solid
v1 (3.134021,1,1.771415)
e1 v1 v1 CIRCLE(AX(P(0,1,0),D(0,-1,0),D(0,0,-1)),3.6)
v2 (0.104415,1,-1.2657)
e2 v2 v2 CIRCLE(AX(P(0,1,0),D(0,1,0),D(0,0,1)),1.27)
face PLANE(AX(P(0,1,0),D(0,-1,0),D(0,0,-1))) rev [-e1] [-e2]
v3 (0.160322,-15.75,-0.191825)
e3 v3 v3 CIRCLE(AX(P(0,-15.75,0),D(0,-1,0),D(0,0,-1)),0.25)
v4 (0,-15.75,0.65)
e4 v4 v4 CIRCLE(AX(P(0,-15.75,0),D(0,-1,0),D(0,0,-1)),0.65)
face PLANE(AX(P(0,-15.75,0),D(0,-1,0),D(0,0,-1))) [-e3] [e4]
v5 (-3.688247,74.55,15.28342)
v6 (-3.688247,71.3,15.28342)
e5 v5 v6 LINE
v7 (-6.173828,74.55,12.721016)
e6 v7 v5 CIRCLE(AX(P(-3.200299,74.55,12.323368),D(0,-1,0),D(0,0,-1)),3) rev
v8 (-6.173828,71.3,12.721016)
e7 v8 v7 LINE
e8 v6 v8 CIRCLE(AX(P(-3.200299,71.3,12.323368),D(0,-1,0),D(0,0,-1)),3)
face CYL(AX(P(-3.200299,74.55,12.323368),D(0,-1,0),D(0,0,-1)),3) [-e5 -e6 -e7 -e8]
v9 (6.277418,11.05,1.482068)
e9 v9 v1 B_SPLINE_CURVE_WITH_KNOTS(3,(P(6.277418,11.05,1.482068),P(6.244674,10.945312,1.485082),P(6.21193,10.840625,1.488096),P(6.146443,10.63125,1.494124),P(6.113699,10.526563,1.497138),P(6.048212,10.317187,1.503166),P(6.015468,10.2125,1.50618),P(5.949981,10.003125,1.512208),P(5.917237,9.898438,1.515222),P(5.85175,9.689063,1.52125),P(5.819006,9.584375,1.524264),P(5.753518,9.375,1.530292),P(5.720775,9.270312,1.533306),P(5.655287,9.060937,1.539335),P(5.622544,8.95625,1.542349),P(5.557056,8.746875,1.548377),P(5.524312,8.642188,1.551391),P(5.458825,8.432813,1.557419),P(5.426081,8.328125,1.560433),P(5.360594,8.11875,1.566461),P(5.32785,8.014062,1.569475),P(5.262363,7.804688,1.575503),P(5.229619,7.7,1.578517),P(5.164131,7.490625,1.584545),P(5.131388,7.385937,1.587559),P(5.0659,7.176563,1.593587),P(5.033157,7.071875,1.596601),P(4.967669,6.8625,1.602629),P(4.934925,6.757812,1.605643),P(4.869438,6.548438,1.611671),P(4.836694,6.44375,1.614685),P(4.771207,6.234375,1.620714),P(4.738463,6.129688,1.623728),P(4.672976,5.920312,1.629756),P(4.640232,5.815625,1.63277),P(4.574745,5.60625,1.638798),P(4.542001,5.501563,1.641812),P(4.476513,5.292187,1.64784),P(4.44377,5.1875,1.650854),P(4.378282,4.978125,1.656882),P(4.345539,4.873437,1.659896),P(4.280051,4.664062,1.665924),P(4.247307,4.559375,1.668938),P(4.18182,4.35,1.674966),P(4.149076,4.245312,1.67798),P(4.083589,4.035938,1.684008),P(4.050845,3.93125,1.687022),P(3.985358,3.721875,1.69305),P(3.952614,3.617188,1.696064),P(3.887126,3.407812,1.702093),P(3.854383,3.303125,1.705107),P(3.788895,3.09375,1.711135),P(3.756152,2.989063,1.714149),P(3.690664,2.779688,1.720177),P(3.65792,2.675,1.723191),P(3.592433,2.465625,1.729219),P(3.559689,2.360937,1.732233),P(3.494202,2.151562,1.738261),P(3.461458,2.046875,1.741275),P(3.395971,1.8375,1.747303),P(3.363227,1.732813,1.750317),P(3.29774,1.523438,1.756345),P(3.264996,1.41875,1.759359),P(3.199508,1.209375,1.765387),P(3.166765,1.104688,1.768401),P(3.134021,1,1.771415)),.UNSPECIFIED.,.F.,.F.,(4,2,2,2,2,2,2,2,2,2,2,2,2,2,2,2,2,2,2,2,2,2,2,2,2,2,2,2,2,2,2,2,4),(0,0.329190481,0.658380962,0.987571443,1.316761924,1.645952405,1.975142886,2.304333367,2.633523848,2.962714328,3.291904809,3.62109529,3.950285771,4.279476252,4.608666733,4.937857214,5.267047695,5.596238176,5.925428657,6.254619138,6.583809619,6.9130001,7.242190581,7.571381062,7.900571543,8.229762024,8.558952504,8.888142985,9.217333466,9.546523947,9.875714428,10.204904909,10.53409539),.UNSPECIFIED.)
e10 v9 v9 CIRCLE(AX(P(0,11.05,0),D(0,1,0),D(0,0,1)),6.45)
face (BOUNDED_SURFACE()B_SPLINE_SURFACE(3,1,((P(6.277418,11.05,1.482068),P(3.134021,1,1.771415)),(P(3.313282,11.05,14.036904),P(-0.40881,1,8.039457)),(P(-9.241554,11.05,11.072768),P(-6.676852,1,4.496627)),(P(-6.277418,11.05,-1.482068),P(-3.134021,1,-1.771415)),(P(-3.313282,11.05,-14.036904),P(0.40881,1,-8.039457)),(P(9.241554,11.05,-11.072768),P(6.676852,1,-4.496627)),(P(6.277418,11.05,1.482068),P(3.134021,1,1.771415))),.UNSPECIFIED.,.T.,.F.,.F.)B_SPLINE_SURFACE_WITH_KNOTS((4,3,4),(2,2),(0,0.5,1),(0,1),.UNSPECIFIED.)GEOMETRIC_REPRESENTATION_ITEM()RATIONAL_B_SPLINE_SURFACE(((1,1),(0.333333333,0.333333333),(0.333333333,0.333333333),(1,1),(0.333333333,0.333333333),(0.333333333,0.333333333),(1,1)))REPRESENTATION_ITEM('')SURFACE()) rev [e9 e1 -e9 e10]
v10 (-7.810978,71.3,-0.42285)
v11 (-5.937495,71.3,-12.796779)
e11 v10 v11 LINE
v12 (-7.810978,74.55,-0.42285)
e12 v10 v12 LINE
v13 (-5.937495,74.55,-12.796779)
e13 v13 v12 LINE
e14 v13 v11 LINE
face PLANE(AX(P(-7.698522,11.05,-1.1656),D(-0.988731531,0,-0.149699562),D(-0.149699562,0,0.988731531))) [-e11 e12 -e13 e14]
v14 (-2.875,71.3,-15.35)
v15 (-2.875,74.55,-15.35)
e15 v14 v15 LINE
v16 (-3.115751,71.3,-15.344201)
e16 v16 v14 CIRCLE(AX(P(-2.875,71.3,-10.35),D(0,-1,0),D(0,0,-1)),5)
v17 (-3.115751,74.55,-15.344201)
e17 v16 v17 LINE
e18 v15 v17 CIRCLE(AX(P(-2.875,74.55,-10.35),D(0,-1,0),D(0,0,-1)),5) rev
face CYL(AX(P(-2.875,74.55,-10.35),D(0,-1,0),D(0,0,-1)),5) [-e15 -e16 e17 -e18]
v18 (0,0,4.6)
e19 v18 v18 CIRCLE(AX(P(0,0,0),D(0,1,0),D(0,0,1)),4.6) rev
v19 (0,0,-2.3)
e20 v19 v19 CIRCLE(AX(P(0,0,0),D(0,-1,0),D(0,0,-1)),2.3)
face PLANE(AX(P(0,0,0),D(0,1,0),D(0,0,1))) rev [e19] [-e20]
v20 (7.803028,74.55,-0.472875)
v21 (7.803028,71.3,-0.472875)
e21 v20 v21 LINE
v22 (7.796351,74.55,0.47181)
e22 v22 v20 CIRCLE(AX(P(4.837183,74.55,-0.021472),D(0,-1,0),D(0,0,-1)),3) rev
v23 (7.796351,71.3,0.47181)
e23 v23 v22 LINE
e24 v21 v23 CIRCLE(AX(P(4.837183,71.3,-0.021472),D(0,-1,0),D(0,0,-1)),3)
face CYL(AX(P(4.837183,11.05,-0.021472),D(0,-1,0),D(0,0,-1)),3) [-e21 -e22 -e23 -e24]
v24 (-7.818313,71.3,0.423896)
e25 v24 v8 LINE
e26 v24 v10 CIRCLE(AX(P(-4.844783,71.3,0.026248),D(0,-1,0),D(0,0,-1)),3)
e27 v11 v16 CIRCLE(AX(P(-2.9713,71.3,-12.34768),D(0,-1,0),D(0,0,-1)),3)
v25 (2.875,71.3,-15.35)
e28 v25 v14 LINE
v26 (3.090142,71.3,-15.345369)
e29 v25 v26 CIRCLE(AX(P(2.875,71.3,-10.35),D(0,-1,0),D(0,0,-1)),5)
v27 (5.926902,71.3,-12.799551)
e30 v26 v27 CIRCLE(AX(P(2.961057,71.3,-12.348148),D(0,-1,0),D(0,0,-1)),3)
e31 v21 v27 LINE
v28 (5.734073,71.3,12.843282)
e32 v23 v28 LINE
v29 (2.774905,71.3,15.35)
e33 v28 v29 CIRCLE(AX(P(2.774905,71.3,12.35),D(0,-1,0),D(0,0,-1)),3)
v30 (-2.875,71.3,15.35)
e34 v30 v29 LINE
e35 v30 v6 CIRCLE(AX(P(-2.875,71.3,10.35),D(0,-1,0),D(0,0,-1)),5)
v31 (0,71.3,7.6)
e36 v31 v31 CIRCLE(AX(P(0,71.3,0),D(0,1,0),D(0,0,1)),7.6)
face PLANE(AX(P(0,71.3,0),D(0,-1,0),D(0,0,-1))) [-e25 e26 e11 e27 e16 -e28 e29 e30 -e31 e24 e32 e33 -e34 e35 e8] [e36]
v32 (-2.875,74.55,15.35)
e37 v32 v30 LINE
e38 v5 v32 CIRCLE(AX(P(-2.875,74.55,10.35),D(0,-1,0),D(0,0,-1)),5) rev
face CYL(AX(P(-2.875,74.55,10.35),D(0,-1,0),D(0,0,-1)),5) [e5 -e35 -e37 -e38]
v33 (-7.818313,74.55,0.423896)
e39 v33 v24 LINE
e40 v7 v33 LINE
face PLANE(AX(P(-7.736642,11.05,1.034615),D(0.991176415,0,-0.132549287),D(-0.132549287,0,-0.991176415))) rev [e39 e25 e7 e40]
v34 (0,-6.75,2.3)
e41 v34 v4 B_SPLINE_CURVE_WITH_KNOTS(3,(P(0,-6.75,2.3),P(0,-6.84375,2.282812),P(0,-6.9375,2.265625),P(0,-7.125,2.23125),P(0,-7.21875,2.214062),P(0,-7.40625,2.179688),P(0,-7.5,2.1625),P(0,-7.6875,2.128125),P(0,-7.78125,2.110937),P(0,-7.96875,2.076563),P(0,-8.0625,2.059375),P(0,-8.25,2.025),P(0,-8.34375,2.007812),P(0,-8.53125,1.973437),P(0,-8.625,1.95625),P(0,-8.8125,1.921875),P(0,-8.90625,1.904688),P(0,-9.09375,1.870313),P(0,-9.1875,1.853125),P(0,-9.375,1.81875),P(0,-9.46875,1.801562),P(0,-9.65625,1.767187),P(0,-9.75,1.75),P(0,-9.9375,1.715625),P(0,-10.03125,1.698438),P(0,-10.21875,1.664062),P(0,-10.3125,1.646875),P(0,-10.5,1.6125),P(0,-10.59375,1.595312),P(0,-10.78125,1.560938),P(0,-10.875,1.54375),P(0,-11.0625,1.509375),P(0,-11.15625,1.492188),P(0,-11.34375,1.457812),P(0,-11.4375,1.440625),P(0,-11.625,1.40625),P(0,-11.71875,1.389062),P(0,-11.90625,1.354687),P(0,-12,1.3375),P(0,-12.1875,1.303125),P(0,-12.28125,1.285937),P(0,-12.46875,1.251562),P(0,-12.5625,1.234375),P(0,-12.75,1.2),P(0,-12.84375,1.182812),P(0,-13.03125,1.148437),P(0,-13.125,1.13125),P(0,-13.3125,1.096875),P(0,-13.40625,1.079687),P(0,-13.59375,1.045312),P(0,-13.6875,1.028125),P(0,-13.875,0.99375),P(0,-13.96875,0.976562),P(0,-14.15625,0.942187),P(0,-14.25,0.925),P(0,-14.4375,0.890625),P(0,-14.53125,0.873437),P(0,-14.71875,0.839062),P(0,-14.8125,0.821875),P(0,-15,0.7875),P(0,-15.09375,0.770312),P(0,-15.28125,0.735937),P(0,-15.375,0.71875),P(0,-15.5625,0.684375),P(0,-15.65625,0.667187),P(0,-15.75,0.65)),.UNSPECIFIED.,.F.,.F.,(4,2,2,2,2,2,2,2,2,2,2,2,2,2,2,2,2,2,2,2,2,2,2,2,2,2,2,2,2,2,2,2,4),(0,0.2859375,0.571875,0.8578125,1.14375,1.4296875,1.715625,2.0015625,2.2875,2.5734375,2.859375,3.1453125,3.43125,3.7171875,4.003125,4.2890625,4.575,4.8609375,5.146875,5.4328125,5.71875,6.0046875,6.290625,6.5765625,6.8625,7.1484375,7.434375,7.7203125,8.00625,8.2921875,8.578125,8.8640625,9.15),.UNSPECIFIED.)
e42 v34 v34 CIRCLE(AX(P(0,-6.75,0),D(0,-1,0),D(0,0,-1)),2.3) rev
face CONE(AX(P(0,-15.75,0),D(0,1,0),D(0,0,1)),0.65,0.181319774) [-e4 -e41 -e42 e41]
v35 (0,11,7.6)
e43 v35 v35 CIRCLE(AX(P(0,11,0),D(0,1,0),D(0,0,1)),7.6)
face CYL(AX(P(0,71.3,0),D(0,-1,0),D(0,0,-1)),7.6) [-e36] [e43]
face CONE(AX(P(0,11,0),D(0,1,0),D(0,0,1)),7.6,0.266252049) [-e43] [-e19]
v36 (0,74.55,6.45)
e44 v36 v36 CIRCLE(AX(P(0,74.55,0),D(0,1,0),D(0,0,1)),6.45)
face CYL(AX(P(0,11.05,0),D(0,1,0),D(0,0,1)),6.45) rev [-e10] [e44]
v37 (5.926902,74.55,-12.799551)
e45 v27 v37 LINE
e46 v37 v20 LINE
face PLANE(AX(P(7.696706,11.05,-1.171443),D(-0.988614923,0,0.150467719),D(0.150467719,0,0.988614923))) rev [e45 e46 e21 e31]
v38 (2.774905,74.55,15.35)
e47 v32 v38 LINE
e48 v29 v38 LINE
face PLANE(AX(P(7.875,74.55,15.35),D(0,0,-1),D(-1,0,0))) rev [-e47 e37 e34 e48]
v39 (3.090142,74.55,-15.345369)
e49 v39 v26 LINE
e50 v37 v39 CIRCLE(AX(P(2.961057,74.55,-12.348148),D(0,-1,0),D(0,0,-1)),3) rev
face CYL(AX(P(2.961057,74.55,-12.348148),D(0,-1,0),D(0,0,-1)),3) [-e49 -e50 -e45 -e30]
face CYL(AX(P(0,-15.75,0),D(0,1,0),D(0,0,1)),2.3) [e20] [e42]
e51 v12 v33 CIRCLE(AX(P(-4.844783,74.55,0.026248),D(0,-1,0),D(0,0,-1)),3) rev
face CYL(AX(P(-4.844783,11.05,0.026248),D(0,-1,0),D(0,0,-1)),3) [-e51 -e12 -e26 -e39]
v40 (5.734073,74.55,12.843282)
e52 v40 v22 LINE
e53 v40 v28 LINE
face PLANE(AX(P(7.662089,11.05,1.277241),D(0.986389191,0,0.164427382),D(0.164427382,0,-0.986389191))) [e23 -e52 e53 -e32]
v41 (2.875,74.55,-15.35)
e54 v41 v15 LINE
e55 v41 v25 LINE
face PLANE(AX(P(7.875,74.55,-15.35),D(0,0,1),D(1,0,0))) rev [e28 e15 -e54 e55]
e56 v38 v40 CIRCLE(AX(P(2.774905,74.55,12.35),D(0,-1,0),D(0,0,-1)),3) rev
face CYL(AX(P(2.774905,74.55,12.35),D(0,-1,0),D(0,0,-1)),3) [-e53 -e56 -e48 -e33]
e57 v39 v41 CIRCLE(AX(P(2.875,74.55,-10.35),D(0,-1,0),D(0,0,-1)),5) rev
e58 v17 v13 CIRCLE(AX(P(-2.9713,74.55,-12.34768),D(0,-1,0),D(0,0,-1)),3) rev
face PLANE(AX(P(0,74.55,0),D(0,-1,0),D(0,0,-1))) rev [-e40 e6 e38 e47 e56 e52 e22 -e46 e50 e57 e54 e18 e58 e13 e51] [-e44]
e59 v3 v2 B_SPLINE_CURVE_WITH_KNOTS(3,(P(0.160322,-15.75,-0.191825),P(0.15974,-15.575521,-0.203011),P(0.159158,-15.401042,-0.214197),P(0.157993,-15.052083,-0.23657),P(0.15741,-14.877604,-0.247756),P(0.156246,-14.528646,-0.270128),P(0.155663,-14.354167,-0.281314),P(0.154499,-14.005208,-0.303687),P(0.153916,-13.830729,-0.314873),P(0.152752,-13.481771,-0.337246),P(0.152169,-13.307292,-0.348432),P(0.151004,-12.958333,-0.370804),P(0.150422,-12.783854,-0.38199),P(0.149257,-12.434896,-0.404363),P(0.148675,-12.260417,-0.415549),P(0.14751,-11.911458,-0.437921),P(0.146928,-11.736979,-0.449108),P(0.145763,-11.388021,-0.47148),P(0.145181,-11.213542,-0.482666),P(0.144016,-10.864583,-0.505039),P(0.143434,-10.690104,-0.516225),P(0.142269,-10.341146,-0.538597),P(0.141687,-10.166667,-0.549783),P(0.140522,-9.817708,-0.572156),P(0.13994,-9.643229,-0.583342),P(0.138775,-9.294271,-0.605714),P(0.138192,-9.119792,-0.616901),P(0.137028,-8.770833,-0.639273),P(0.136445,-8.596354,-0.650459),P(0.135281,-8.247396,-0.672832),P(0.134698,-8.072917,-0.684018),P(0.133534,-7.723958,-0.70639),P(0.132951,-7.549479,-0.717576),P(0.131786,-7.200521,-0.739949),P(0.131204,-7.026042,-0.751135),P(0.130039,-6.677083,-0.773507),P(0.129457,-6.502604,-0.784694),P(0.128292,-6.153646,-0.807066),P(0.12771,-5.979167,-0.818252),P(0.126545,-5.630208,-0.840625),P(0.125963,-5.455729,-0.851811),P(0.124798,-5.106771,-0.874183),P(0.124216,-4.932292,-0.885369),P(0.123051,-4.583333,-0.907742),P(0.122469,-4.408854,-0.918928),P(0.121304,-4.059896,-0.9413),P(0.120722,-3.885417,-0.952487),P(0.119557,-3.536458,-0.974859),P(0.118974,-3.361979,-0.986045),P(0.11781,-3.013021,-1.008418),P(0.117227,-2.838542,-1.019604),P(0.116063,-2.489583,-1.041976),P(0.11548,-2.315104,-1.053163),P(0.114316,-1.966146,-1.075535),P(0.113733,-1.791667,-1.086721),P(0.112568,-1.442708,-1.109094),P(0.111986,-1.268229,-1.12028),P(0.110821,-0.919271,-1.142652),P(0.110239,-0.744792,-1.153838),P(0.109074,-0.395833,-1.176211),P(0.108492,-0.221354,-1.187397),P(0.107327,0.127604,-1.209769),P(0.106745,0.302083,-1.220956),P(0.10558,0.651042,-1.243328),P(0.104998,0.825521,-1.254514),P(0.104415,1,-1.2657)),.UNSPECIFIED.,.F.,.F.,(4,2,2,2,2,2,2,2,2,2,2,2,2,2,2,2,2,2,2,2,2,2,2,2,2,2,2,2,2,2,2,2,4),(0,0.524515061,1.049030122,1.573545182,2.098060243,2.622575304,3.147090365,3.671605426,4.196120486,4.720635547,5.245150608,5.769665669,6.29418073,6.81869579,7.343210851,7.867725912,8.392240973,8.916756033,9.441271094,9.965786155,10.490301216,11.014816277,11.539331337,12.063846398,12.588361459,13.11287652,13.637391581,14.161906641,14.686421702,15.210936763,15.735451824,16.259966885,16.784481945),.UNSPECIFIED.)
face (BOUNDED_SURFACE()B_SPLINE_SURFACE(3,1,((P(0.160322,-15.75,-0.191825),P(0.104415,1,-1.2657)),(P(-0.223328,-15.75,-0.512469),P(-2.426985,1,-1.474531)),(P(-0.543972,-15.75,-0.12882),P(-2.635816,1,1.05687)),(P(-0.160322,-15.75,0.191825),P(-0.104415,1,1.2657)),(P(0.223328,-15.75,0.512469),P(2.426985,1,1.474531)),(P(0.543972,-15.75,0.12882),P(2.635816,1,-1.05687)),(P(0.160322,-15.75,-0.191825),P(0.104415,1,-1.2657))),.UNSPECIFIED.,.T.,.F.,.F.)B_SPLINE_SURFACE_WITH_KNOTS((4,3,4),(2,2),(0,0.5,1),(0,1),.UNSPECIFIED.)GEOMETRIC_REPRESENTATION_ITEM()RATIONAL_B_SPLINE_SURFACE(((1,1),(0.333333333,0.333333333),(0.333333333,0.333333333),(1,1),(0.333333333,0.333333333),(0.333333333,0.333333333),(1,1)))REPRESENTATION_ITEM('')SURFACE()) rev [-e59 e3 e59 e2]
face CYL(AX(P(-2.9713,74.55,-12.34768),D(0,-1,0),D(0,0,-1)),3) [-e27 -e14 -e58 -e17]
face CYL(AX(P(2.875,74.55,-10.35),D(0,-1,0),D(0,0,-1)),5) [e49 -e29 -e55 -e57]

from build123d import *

# Parameters (mm, degrees)
SKETCH1_R           = 7.6
BOSS_EXTRUDE1_DEPTH = 71.3
CHAMFER1_SIZE       = 3
CHAMFER1_SIZE2      = 11
SKETCH2_R           = 2.3
BOSS_EXTRUDE2_DEPTH = 15.75
CHAMFER2_SIZE       = 9
CHAMFER2_SIZE2      = 1.65
SKETCH3_W           = 15.75
SKETCH3_H           = 30.7
BOSS_EXTRUDE3_DEPTH = 3.25
FILLET1_R           = 5
SKETCH4_R           = 6.45
CUT_EXTRUDE1_DEPTH  = 63.5
CUT_EXTRUDE2_DEPTH  = 63.5
FILLET2_R           = 3


with BuildPart() as part:
    # Sketch1 → Boss-Extrude1 (new body)
    with BuildSketch(Plane(origin=(0, 0, 0), x_dir=(1, 0, 0), z_dir=(0, 1, 0))):
        with Locations(Location((0, 0, 0), (0, 0, 270))):
            Circle(SKETCH1_R)
    extrude(amount=BOSS_EXTRUDE1_DEPTH)

    # Chamfer1
    chamfer1_edges = [part.edges().sort_by_distance(p)[0] for p in [
        (0, 0, -7.6),
    ]]
    chamfer1_side = [part.faces().sort_by_distance(p)[0] for p in [
        (0, 0, 0),
    ]]
    chamfer(chamfer1_edges, length=CHAMFER1_SIZE, length2=CHAMFER1_SIZE2, reference=chamfer1_side[0])

    # Sketch2 → Boss-Extrude2 (add)
    with BuildSketch(Plane.XZ):
        with Locations(Location((0, 0, 0), (0, 0, 270))):
            Circle(SKETCH2_R)
    extrude(amount=BOSS_EXTRUDE2_DEPTH)

    # Chamfer2
    chamfer2_edges = [part.edges().sort_by_distance(p)[0] for p in [
        (0, -15.75, 2.3),
    ]]
    chamfer2_side = [part.faces().sort_by_distance(p)[0] for p in [
        (0, -7.875, 2.3),
    ]]
    chamfer(chamfer2_edges, length=CHAMFER2_SIZE, length2=CHAMFER2_SIZE2, reference=chamfer2_side[0])

    # Sketch3 → Boss-Extrude3 (add)
    with BuildSketch(Plane(origin=(0, 71.3, 0), x_dir=(1, 0, 0), z_dir=(0, 1, 0))):
        Rectangle(SKETCH3_W, SKETCH3_H)
    extrude(amount=BOSS_EXTRUDE3_DEPTH)

    # Fillet1
    fillet1_edges = [part.edges().sort_by_distance(p)[0] for p in [
        (7.875, 72.925, 15.35),
        (7.875, 72.925, -15.35),
        (-7.875, 72.925, -15.35),
        (-7.875, 72.925, 15.35),
    ]]
    fillet(fillet1_edges, radius=FILLET1_R)

    # Sketch4 → Cut-Extrude1 (cut)
    with BuildSketch(Plane(origin=(0, 74.55, 0), x_dir=(1, 0, 0), z_dir=(0, 1, 0))):
        with Locations(Location((0, 0, 0), (0, 0, 270))):
            Circle(SKETCH4_R)
    extrude(amount=-CUT_EXTRUDE1_DEPTH, mode=Mode.SUBTRACT)

    # Sketch5 → Cut-Extrude2 (cut)
    with BuildSketch(Plane(origin=(0, 74.55, 0), x_dir=(1, 0, 0), z_dir=(0, 1, 0))):
        with BuildLine():
            Line((-5.96525379, -14.280690971), (-7.875, 0))
            Line((-7.875, 0), (-7.875, -10.35))
            ThreePointArc((-7.875, -10.35), (-7.372291905, -12.535032156), (-5.96525379, -14.280690971))
        make_face()
        with BuildLine():
            Line((7.875, -10.35), (7.875, 0))
            Line((7.875, 0), (5.433607168, -14.645757135))
            ThreePointArc((5.433607168, -14.645757135), (7.222012528, -12.820522633), (7.875, -10.35))
        make_face()
        with BuildLine():
            ThreePointArc((7.875, 10.35), (7.28906276, 12.698627247), (5.668580021, 14.496795228))
            Line((5.668580021, 14.496795228), (7.875, 0))
            Line((7.875, 0), (7.875, 10.35))
        make_face()
        with BuildLine():
            Line((-7.875, 0), (-5.681416662, 14.488118596))
            ThreePointArc((-5.681416662, 14.488118596), (-7.29269642, 12.69178529), (-7.875, 10.35))
            Line((-7.875, 10.35), (-7.875, 0))
        make_face()
    extrude(amount=-CUT_EXTRUDE2_DEPTH, mode=Mode.SUBTRACT)

    # Fillet2
    fillet2_edges = [part.edges().sort_by_distance(p)[0] for p in [
        (-5.681416662, 72.925, -14.488118596),
        (-5.96525379, 72.925, 14.280690971),
        (5.433607168, 72.925, 14.645757135),
        (5.668580021, 72.925, -14.496795228),
        (7.875, 72.925, 0),
        (-7.875, 72.925, 0),
    ]]
    fillet(fillet2_edges, radius=FILLET2_R)

    # Cut-Loft1: read off the stored shape, not the designer's step
    # Cut-Loft1: loft between two sections, ruled curve by curve
    cut_loft1_from = [
        Edge.make_bspline([(6.277417846, 11.05, 1.482067877), (3.313282092, 11.05, 14.036903568), (-9.241553599, 11.05, 11.072767814), (-6.277417846, 11.05, -1.482067877), (-3.313282092, 11.05, -14.036903568), (9.241553599, 11.05, -11.072767814), (6.277417846, 11.05, 1.482067877)], [0, 0, 0, 0, 0.5, 0.5, 0.5, 1, 1, 1, 1], 3, [1, 0.333333333, 0.333333333, 1, 0.333333333, 0.333333333, 1]),
    ]
    cut_loft1_to = [
        Edge.make_bspline([(3.134021001, 1, 1.771415357), (-0.408809713, 1, 8.039457358), (-6.676851715, 1, 4.496626645), (-3.134021001, 1, -1.771415357), (0.408809713, 1, -8.039457358), (6.676851715, 1, -4.496626645), (3.134021001, 1, 1.771415357)], [0, 0, 0, 0, 0.5, 0.5, 0.5, 1, 1, 1, 1], 3, [1, 0.333333333, 0.333333333, 1, 0.333333333, 0.333333333, 1]),
    ]
    cut_loft1 = Solid(Shell([*[Face.make_surface_from_curves(cut_loft1_from[k], cut_loft1_to[k]) for k in range(1)], Face(Wire(cut_loft1_from)), Face(Wire(cut_loft1_to))]))
    add(cut_loft1, mode=Mode.SUBTRACT)

    # Cut-Loft2: read off the stored shape, not the designer's step
    # Cut-Loft2: loft between two sections, ruled curve by curve
    cut_loft2_from = [
        Edge.make_bspline([(0.160322236, -15.75, -0.19182487), (-0.223327504, -15.75, -0.512469341), (-0.543971976, -15.75, -0.128819601), (-0.160322236, -15.75, 0.19182487), (0.223327504, -15.75, 0.512469341), (0.543971976, -15.75, 0.128819601), (0.160322236, -15.75, -0.19182487)], [0, 0, 0, 0, 0.5, 0.5, 0.5, 1, 1, 1, 1], 3, [1, 0.333333333, 0.333333333, 1, 0.333333333, 0.333333333, 1]),
    ]
    cut_loft2_to = [
        Edge.make_bspline([(0.10441536, 1, -1.265700372), (-2.426985384, 1, -1.474531093), (-2.635816105, 1, 1.056869652), (-0.10441536, 1, 1.265700372), (2.426985384, 1, 1.474531093), (2.635816105, 1, -1.056869652), (0.10441536, 1, -1.265700372)], [0, 0, 0, 0, 0.5, 0.5, 0.5, 1, 1, 1, 1], 3, [1, 0.333333333, 0.333333333, 1, 0.333333333, 0.333333333, 1]),
    ]
    cut_loft2 = Solid(Shell([*[Face.make_surface_from_curves(cut_loft2_from[k], cut_loft2_to[k]) for k in range(1)], Face(Wire(cut_loft2_from)), Face(Wire(cut_loft2_to))]))
    add(cut_loft2, mode=Mode.SUBTRACT)


solid = part.part
